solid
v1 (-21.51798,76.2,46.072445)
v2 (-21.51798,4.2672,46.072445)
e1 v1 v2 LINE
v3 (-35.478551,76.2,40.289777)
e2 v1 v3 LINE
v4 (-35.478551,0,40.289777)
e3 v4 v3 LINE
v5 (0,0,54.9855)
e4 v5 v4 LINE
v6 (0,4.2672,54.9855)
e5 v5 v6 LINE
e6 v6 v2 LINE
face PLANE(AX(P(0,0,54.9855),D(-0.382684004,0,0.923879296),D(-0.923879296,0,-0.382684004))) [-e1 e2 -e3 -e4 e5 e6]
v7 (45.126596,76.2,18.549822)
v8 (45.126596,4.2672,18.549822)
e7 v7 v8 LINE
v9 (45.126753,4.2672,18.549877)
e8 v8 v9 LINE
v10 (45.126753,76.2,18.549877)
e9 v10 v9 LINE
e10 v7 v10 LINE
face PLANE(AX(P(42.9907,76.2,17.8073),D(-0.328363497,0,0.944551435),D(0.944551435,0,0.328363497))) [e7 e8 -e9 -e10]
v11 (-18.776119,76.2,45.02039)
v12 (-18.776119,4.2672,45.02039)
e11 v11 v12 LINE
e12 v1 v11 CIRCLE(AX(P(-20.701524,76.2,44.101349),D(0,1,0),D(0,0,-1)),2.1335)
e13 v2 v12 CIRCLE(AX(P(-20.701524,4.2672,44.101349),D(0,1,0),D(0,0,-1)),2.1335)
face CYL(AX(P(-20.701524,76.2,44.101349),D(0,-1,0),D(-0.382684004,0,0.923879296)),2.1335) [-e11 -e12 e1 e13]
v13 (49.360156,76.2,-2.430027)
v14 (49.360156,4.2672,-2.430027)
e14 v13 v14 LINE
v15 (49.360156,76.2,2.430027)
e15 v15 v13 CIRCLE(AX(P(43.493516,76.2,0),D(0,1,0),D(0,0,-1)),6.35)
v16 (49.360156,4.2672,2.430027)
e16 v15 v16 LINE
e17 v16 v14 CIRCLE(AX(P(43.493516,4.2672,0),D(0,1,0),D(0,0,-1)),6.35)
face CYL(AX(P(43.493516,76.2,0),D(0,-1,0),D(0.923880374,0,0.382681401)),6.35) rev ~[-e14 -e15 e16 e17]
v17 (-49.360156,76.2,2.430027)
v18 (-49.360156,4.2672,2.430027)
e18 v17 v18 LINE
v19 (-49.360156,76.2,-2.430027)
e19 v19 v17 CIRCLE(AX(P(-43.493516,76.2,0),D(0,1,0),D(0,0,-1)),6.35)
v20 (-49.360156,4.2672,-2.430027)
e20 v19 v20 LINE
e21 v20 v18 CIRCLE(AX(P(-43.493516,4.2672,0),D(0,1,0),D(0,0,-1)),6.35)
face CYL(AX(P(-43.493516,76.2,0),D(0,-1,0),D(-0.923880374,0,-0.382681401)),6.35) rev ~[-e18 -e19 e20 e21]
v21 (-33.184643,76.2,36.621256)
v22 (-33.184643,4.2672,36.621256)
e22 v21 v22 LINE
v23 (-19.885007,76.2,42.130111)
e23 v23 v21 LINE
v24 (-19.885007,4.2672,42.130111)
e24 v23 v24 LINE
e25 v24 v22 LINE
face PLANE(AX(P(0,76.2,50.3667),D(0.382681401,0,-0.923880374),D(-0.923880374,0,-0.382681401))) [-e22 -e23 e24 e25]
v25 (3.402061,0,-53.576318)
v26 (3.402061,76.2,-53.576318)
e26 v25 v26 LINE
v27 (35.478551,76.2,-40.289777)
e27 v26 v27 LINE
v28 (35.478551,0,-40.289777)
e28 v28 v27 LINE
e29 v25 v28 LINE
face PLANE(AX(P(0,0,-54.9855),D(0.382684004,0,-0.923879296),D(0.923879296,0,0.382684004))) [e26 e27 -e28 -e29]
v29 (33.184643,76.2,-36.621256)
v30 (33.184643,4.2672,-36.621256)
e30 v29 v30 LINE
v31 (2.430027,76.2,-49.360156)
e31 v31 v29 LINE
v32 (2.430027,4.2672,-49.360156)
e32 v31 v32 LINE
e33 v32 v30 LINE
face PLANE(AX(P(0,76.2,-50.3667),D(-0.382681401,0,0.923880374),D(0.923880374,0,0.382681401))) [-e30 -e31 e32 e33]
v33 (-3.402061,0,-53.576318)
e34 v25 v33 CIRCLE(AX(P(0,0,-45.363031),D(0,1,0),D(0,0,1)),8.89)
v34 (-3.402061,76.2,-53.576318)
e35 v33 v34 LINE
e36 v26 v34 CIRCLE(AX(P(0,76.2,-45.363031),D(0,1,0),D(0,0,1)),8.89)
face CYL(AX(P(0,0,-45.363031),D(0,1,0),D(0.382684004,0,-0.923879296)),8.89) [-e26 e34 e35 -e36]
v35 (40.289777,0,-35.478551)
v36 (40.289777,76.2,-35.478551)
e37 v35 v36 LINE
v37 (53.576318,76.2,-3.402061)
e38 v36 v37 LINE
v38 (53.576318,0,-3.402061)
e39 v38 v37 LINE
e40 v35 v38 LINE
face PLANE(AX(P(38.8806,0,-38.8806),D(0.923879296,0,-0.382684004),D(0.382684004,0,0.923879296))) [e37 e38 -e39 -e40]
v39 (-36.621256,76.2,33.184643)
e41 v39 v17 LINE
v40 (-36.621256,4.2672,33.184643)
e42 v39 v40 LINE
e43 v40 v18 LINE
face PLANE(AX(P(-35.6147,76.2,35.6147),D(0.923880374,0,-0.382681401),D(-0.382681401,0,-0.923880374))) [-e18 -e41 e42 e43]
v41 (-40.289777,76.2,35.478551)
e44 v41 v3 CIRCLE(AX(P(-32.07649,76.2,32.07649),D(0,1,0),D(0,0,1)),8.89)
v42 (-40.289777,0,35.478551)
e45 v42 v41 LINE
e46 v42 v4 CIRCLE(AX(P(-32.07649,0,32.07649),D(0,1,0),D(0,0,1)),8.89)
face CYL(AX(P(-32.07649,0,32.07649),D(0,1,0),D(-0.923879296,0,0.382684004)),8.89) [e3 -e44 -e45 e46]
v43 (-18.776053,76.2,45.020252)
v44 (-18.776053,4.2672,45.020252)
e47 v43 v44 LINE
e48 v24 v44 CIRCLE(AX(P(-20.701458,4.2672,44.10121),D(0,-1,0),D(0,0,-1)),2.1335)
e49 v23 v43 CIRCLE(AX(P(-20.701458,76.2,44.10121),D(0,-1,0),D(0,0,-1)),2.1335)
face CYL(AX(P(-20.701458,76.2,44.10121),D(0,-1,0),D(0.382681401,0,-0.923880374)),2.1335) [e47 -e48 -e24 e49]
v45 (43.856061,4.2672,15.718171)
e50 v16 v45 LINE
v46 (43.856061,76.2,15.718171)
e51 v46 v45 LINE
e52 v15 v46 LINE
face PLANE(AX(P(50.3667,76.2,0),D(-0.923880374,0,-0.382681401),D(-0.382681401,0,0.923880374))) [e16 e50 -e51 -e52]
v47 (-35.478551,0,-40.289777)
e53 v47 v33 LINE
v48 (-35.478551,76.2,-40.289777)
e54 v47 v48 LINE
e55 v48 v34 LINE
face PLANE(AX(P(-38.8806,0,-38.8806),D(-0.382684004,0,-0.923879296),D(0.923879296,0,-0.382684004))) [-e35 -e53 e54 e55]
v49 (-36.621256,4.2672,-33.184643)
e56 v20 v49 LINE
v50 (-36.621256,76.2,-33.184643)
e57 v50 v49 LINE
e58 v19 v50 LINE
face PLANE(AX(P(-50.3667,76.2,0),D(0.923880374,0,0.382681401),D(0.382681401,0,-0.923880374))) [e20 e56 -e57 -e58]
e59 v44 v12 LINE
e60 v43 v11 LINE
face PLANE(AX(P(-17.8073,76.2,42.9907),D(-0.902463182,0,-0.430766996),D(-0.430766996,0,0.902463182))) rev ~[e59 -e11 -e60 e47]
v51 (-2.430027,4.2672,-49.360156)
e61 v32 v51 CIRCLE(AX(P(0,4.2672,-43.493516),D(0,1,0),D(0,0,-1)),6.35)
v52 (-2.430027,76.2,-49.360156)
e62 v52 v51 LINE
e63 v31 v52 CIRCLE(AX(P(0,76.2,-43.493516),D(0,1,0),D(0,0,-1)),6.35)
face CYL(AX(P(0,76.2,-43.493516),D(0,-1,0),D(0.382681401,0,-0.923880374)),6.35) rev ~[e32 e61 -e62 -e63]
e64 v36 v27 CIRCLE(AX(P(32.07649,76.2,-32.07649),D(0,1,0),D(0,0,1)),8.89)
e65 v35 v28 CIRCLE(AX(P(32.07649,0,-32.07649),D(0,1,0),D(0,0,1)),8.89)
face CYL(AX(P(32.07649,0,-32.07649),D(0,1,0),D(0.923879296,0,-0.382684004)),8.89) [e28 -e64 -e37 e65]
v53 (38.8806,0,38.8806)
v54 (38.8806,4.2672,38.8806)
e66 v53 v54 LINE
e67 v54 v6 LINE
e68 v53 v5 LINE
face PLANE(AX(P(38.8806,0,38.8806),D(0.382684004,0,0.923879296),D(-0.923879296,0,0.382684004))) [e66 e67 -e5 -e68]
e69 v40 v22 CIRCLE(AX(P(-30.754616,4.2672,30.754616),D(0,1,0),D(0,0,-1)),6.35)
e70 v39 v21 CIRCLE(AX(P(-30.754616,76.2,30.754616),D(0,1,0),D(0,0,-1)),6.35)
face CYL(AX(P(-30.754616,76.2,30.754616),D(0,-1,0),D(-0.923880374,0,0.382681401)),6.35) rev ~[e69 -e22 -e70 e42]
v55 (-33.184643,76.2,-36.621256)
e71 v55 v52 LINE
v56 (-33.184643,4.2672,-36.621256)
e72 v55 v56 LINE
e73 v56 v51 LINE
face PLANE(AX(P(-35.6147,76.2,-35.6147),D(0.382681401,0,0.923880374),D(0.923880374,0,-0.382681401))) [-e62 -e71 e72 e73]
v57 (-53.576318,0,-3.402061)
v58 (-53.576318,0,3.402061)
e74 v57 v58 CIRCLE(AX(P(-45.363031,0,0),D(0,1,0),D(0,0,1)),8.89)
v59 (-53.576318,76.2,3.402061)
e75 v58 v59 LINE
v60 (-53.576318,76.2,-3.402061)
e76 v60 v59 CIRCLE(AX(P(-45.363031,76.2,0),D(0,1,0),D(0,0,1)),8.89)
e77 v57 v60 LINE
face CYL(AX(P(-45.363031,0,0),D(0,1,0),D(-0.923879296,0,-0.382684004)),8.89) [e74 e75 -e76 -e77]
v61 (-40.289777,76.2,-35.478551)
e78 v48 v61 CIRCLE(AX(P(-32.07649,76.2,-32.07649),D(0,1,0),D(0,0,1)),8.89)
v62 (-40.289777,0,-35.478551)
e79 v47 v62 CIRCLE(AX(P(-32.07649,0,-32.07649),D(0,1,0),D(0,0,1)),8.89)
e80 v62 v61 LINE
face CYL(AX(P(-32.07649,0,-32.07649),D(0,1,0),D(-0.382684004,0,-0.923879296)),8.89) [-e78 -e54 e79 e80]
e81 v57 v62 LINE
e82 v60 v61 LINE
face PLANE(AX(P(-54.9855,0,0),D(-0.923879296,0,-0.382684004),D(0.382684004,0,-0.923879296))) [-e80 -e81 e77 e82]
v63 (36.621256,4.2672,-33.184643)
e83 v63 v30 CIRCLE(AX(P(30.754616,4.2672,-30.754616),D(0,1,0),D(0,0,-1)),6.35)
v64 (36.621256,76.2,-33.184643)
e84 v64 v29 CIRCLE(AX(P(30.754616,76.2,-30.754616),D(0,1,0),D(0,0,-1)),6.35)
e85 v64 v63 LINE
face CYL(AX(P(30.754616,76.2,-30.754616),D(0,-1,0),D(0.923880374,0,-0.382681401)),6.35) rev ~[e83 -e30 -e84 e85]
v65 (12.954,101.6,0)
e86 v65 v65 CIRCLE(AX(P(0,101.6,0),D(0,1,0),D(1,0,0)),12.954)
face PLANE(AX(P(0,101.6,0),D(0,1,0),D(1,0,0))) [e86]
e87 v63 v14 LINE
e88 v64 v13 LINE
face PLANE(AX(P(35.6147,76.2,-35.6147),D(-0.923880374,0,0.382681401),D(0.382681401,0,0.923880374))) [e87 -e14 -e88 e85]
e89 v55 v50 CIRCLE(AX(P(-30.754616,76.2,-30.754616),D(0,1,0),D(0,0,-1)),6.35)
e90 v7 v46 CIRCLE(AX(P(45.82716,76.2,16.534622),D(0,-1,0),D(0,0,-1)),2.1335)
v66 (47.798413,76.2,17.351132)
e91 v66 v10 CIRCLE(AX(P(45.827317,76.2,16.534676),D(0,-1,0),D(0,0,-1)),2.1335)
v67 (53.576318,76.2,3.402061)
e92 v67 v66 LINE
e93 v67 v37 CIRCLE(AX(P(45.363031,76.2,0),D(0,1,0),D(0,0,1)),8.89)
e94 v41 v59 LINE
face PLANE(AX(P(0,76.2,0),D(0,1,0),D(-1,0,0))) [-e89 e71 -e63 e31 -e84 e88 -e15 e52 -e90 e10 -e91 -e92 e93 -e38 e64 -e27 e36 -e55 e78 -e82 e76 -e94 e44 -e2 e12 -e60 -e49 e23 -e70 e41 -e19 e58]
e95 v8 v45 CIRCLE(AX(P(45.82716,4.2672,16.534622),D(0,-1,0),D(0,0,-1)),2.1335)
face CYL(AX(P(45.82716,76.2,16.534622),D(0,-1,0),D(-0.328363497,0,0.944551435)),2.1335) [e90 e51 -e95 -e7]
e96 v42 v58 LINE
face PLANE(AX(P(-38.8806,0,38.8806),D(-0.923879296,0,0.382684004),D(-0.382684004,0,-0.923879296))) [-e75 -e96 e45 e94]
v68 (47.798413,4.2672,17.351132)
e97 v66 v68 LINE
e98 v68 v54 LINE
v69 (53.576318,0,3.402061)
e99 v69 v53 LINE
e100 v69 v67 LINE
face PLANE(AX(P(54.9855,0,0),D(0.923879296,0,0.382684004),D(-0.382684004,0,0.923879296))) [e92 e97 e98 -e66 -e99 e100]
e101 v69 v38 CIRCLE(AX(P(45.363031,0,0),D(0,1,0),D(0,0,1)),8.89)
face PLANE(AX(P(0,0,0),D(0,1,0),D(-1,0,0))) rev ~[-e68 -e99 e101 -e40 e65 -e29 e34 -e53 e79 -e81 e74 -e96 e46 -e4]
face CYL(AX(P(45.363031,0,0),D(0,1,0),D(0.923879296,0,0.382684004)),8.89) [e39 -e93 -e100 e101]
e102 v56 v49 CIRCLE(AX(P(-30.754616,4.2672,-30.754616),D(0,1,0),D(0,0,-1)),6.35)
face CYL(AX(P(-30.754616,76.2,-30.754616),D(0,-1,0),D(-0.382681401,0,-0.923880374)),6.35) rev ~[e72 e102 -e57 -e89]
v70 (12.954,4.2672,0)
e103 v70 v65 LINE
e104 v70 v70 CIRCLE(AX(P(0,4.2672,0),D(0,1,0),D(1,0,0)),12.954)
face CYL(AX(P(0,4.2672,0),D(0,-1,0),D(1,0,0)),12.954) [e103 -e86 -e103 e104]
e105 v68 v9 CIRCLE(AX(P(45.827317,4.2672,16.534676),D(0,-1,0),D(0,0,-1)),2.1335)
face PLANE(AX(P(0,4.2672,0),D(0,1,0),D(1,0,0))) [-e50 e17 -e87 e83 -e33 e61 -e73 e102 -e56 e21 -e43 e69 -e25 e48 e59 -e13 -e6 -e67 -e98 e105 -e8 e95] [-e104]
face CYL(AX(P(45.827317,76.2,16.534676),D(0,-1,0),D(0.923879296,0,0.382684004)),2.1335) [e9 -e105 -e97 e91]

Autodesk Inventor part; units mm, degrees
ref_plane "YZ Plane" through (0, 0, 0) normal (1, 0, 0) x (0, 1, 0)
ref_plane "XZ Plane" through (0, 0, 0) normal (0, 1, 0) x (-1, 0, 0)
ref_plane "XY Plane" through (0, 0, 0) normal (0, 0, 1) x (1, 0, 0)
sketch "Sketch1" plane through (0, 0, 0) normal (0, 1, 0) x (-1, 0, 0)
  line L0 (54.9855, 0) -> (38.8806, -38.8806)
  line L1 (38.8806, -38.8806) -> (0, -54.9855)
  line L2 (0, -54.9855) -> (-38.8806, -38.8806)
  line L3 (-38.8806, -38.8806) -> (-54.9855, 0)
  line L4 (-54.9855, 0) -> (-38.8806, 38.8806)
  line L5 (-38.8806, 38.8806) -> (0, 54.9855)
  line L6 (0, 54.9855) -> (38.8806, 38.8806)
  line L7 (38.8806, 38.8806) -> (54.9855, 0)
  point P0 (0, 0)
  dimension "d0" = 50.8
extrude "Extrusion1" add sketch "Sketch1" along normal blind 76.2
sketch "Sketch2" plane through (0, 76.2, 0) normal (0, 1, 0) x (1, 0, 0)
  line L0 (-50.3667, 0) -> (-35.6147, 35.6147)
  line L1 (-35.6147, 35.6147) -> (0, 50.3667)
  line L2 (0, 50.3667) -> (35.6147, 35.6147)
  line L3 (35.6147, 35.6147) -> (50.3667, 0)
  line L4 (50.3667, 0) -> (35.6147, -35.6147)
  line L5 (35.6147, -35.6147) -> (0, -50.3667)
  line L6 (0, -50.3667) -> (-35.6147, -35.6147)
  line L7 (-35.6147, -35.6147) -> (-50.3667, 0)
  line L8 (38.8806, -38.8806) -> (54.9855, 0) projected
  point P0 (0, 0)
  point P1 (0, 0)
  dimension "d4" = 4.2672
extrude "Extrusion2" cut sketch "Sketch2" against normal blind 71.9328
sketch "Sketch3" plane through (0, 76.2, 0) normal (0, 1, 0) x (1, 0, 0)
  line L0 (-35.6147, -35.6147) -> (-50.3667, 0) projected
  line L1 (-38.8806, -38.8806) -> (0, -54.9855) projected
  line L2 (-32.6208, -74.0252) -> (-0.337, -89.435)
  line L3 (50.3667, 0) -> (35.6147, -35.6147) projected
  line L4 (0, -54.9855) -> (38.8806, -38.8806) projected
  line L5 (63.1414, -63.1414) -> (-0.337, -89.435)
  line L6 (0, -50.3667) -> (-35.6147, -35.6147) projected
  line L7 (-17.8073, -42.9907) -> (-32.6208, -74.0252)
  line L8 (35.6147, 35.6147) -> (50.3667, 0) projected
  line L9 (54.9855, 0) -> (38.8806, 38.8806) projected
  line L10 (82.5817, -31.5707) -> (63.1414, -63.1414)
  line L11 (42.9907, -17.8073) -> (82.5817, -31.5707)
  line L12 (-17.8073, -42.9907) -> (42.9907, -17.8073)
  point P0 (0, 0)
extrude "Extrusion3" cut sketch "Sketch3" against normal blind 71.9328
fillet "Fillet1" radius 2.1336 4 edges at (-17.8073, 40.2336, 42.9907) (-19.648, 40.2336, 46.847) (42.9907, 40.2336, 17.8073) (47.0281, 40.2336, 19.2109)
sketch "Sketch4" plane through (0, 4.2672, 0) normal (0, 1, 0) x (1, 0, 0)
  circle A0 centre (0, 0) radius 12.954
  dimension "d10" = 25.908
extrude "Extrusion4" add sketch "Sketch4" along normal blind 97.3328
fillet "Fillet2" radius 6.35 6 edges at (-50.3667, 40.2336, 0) (-35.6147, 40.2336, -35.6147) (0, 40.2336, -50.3667) (35.6147, 40.2336, -35.6147) (50.3667, 40.2336, 0) (-35.6147, 40.2336, 35.6147)
fillet "Fillet3" radius 8.89 6 edges at (54.9855, 38.1, 0) (38.8806, 38.1, -38.8806) (-38.8806, 38.1, 38.8806) (-54.9855, 38.1, 0) (-38.8806, 38.1, -38.8806) (0, 38.1, -54.9855)
properties part number "holder-8"
